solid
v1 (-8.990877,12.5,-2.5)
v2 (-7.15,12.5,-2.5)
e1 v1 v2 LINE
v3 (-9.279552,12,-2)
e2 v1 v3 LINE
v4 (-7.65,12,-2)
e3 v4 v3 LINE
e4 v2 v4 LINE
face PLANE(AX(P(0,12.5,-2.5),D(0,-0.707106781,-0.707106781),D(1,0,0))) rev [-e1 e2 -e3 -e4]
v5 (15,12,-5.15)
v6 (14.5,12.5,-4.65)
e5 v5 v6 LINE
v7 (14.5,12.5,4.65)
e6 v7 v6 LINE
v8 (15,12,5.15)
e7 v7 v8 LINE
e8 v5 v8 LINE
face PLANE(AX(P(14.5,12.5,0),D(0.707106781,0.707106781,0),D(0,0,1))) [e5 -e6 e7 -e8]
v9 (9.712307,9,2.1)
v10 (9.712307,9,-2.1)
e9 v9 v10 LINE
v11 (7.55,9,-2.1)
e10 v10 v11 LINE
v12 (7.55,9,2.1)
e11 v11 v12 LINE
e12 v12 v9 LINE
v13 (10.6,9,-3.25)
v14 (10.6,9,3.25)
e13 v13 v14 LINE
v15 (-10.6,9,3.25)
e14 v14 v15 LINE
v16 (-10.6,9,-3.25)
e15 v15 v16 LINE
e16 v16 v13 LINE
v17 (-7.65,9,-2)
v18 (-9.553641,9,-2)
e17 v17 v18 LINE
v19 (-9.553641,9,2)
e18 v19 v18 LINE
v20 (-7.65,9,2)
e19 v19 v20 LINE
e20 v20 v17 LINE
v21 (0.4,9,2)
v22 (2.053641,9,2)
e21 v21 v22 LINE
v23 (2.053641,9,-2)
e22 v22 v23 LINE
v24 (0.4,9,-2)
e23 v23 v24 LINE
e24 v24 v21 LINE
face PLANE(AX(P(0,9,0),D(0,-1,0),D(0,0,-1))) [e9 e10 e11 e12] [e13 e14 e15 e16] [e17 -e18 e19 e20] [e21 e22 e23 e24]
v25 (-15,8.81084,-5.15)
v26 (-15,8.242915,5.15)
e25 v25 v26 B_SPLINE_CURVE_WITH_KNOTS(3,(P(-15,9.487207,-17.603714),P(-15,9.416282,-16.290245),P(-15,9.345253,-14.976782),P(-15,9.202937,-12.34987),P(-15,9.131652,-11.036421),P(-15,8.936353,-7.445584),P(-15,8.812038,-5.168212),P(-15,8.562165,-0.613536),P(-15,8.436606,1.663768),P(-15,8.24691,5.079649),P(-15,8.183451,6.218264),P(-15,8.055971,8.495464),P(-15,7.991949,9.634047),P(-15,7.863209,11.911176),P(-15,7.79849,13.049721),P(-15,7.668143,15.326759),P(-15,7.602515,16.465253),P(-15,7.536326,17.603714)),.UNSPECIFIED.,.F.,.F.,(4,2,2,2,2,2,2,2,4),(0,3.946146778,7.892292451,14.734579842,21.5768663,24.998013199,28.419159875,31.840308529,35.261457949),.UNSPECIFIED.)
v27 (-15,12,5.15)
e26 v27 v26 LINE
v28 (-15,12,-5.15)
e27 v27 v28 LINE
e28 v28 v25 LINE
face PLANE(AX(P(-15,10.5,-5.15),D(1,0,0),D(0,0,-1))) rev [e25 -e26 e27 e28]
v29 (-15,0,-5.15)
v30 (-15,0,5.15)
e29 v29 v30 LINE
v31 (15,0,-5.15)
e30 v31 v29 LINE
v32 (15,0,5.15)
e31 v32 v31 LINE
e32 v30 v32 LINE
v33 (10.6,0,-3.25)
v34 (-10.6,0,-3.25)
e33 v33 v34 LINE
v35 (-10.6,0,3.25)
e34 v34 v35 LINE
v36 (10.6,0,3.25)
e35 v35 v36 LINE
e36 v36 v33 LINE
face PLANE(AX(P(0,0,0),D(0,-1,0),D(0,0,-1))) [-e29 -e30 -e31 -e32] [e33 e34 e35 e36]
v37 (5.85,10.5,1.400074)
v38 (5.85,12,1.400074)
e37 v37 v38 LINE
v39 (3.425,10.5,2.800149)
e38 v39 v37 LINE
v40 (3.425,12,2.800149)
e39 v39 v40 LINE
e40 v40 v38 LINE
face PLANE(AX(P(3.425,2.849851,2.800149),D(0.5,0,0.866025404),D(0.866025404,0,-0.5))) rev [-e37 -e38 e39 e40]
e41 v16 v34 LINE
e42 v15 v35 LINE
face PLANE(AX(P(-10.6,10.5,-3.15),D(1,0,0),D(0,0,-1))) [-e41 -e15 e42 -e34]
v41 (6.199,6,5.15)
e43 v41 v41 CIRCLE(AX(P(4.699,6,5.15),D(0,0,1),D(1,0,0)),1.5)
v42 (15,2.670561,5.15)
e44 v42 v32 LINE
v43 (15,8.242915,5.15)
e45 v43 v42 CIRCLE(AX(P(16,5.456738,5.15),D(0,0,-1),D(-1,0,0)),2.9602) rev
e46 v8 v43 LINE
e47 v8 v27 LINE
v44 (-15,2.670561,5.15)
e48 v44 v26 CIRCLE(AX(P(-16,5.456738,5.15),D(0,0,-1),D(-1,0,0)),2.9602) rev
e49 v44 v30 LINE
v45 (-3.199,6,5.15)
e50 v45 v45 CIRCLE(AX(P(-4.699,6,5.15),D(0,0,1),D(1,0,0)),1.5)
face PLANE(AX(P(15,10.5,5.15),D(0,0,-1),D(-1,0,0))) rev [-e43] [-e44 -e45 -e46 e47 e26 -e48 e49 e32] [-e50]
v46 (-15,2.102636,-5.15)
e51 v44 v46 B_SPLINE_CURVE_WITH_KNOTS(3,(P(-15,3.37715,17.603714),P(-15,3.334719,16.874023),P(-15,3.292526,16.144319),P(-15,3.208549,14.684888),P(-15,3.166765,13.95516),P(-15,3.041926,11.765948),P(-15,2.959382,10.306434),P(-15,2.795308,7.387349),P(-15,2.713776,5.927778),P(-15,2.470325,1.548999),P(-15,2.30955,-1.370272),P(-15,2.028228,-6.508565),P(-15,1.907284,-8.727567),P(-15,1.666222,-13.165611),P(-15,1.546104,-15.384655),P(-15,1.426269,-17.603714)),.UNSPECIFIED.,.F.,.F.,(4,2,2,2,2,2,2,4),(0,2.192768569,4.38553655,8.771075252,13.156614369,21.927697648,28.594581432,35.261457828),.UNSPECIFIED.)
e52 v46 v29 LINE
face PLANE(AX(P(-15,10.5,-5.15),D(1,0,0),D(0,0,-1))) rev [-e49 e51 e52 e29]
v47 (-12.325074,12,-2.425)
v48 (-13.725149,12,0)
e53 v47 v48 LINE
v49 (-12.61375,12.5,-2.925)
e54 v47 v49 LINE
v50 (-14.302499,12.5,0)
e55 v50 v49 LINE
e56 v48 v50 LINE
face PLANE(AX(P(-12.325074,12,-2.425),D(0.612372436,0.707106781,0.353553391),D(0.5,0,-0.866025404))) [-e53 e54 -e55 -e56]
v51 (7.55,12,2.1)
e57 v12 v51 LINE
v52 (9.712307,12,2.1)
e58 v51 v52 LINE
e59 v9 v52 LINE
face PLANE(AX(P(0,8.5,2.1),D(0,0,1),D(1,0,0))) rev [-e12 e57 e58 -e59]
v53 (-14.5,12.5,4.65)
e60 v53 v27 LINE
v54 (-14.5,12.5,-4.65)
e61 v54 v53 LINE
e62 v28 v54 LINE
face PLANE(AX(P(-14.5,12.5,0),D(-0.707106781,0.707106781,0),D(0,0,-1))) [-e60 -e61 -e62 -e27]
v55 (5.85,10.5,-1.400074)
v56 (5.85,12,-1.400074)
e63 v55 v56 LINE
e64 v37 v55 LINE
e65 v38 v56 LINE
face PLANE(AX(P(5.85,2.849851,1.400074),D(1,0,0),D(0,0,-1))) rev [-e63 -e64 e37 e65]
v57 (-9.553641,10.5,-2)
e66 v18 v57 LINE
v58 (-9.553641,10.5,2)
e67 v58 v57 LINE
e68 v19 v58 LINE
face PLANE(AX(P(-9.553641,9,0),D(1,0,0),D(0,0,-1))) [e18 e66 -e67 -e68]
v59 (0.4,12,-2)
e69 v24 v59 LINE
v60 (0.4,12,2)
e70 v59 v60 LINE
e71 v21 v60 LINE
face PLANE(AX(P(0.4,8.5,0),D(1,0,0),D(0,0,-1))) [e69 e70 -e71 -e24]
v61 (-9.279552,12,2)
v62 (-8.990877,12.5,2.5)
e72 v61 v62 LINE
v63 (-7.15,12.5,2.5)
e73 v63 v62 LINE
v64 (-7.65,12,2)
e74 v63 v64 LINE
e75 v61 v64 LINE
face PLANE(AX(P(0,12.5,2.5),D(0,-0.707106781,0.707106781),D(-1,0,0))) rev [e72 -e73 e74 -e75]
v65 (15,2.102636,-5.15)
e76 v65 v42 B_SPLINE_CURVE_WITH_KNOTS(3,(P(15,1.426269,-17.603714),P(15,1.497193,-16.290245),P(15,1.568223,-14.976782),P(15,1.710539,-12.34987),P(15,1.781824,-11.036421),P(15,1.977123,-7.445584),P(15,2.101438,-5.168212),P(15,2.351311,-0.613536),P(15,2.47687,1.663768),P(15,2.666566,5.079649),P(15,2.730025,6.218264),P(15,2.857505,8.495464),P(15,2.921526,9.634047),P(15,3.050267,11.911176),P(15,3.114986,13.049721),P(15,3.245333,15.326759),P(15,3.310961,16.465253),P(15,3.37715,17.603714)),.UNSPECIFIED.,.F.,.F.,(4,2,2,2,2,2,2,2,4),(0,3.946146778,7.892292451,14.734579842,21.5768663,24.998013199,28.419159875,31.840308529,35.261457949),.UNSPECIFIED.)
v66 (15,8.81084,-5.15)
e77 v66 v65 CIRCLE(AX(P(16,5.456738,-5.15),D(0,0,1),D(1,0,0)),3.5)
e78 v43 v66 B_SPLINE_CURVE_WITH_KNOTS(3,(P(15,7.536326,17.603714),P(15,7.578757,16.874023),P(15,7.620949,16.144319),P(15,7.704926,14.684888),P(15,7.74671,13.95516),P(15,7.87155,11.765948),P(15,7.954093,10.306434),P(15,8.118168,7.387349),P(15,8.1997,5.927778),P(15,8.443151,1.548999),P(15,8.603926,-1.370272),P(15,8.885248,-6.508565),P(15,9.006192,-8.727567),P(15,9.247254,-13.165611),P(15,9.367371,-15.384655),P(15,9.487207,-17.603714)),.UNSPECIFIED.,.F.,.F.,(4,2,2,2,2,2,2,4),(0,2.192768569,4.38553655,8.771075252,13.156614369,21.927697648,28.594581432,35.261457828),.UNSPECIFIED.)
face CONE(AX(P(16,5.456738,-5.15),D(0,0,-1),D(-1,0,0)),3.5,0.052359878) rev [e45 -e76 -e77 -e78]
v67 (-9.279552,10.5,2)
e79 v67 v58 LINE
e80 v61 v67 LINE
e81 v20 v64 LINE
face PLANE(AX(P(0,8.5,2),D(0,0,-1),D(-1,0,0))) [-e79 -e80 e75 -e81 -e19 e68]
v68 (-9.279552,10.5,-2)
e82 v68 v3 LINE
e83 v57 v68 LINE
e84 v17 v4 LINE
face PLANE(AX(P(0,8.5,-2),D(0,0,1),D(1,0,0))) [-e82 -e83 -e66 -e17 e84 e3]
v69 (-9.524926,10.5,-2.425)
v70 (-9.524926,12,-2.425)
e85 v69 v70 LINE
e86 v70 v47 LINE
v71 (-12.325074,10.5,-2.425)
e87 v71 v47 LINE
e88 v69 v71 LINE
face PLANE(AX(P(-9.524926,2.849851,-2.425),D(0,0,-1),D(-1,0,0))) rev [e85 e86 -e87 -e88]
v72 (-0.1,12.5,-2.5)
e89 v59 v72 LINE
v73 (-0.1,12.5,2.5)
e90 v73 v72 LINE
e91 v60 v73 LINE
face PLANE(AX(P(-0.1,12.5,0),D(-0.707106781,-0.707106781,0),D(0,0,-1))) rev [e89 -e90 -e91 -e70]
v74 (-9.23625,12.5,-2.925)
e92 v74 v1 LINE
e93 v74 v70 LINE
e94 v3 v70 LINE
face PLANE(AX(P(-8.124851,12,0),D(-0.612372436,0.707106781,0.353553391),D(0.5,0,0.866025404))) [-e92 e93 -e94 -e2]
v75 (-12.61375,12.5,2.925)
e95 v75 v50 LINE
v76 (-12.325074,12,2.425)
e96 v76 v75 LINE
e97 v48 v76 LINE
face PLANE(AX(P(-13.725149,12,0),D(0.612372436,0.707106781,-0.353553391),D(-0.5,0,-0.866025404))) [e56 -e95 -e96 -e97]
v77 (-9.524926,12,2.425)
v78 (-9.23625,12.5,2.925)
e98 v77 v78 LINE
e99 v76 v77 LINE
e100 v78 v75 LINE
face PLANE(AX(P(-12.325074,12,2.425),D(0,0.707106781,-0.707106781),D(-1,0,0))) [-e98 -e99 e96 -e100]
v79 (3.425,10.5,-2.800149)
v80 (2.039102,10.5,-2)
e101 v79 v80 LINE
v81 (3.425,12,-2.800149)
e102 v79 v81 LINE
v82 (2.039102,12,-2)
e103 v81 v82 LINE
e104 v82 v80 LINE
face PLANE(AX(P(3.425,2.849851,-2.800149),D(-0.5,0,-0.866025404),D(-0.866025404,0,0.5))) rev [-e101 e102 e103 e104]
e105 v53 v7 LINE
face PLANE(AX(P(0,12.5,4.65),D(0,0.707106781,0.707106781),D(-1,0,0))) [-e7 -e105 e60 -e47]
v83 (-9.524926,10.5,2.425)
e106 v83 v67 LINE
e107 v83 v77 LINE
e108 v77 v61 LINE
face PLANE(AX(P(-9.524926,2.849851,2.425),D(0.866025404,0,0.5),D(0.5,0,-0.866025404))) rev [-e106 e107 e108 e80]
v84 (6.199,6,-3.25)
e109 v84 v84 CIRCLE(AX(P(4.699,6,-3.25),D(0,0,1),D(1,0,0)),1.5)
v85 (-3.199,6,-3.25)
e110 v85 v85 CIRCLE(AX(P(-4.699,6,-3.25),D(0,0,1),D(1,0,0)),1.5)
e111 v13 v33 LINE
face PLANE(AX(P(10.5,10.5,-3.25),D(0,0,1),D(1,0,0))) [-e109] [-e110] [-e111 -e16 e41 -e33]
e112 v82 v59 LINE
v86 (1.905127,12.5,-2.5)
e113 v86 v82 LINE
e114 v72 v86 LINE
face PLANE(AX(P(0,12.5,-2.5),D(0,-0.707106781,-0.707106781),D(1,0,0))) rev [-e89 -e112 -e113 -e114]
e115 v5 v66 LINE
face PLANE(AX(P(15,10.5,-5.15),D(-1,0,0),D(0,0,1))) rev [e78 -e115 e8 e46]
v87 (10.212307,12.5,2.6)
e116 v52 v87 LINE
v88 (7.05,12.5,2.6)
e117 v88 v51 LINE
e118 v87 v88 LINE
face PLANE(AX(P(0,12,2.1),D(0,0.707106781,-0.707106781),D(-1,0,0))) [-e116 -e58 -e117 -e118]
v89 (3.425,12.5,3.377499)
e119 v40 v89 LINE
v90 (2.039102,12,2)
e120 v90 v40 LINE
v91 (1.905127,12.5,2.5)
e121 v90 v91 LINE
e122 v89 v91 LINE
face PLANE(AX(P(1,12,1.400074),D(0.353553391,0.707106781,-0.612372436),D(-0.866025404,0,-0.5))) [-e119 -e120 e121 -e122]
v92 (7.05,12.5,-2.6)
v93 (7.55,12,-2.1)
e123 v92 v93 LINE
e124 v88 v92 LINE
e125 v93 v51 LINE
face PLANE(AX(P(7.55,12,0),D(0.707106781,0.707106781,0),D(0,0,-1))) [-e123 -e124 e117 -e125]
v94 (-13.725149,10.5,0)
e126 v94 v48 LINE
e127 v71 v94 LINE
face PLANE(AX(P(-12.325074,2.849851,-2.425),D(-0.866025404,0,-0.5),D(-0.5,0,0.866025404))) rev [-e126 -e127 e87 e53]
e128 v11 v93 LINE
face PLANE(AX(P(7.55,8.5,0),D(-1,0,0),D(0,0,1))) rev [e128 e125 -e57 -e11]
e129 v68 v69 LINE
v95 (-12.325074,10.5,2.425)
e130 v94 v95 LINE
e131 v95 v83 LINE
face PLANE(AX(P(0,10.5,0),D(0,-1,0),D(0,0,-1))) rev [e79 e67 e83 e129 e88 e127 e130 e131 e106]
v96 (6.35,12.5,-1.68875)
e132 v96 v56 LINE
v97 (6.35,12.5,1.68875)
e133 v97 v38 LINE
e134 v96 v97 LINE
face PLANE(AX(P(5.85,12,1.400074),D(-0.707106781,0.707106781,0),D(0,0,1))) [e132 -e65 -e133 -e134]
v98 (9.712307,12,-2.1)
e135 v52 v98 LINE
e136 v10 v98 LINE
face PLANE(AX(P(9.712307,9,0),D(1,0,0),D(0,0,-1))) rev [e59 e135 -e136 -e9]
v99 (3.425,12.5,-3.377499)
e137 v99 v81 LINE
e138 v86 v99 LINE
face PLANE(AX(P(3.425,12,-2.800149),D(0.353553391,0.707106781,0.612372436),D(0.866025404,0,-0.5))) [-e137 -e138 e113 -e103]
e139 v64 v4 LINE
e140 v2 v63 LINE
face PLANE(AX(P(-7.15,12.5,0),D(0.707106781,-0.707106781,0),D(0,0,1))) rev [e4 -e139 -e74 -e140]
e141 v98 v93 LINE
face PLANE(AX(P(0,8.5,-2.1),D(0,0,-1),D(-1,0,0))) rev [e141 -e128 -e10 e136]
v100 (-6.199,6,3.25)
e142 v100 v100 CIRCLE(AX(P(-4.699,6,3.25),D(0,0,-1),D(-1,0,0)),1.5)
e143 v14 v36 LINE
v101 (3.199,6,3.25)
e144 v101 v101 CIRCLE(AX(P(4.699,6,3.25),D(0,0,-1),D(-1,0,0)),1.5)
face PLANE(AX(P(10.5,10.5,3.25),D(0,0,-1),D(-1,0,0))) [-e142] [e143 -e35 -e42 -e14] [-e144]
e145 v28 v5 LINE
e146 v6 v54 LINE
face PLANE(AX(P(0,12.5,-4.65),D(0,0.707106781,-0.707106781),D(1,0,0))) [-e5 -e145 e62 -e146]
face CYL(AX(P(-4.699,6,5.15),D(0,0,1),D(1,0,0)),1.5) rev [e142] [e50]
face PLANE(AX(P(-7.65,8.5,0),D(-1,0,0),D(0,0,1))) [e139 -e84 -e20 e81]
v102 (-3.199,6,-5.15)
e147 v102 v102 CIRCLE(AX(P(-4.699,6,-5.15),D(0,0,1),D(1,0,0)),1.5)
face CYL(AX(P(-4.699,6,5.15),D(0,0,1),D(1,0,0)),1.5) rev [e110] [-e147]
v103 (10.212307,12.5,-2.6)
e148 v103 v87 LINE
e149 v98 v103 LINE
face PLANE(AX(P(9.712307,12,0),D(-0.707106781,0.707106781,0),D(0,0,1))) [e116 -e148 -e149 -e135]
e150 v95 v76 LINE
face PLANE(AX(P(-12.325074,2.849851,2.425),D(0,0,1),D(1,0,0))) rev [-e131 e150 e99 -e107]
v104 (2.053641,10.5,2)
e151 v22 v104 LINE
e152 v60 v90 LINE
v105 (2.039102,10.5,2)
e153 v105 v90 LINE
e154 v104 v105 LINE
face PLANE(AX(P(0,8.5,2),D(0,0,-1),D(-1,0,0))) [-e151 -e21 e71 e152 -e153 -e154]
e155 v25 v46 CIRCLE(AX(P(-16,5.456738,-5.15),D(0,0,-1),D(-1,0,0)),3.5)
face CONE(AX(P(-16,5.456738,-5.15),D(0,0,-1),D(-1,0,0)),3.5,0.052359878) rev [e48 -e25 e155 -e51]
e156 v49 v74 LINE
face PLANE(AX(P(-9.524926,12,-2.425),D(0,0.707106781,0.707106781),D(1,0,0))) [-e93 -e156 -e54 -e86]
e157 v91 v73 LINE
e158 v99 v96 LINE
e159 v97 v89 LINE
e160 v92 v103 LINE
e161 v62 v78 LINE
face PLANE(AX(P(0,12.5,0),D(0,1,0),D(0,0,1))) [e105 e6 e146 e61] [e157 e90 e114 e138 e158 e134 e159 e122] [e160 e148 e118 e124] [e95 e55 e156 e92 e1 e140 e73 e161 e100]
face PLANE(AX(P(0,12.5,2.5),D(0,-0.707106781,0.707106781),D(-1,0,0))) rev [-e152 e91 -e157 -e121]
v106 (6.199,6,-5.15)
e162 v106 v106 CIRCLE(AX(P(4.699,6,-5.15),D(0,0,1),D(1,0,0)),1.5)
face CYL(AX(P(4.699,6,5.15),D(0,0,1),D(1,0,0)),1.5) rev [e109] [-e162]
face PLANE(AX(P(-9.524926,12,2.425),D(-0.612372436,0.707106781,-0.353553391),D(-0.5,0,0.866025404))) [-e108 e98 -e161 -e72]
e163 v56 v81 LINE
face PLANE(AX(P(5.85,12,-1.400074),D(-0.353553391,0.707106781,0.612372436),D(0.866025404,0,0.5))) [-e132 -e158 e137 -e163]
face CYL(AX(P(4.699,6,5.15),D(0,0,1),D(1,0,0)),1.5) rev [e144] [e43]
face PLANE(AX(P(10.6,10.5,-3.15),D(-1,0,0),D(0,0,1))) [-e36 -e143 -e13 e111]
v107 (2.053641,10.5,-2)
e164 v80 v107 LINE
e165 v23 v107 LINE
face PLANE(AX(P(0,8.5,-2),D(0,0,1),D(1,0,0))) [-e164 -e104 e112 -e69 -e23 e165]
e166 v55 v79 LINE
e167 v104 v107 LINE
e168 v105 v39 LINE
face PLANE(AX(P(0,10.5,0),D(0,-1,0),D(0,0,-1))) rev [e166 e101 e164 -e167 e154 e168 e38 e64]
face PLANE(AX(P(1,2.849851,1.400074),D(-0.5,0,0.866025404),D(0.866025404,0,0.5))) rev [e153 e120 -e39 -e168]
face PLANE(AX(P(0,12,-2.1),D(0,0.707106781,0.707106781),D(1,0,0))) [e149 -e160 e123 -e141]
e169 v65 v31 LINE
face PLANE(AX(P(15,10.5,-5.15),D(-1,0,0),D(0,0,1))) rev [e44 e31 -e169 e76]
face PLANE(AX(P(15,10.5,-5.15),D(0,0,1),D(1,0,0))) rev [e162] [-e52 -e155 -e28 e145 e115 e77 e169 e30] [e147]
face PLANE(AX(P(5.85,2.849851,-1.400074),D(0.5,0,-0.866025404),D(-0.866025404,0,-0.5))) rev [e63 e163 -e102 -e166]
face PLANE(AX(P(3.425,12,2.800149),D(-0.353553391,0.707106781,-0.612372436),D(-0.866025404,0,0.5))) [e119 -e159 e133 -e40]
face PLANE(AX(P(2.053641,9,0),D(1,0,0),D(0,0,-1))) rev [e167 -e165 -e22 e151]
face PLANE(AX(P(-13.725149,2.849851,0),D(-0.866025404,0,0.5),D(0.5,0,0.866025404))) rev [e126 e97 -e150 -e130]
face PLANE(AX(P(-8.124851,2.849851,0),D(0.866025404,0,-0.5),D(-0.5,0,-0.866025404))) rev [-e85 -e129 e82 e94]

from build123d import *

# Parameters (mm, degrees)
SKETCH1_W                    = 30
SKETCH1_H                    = 10.3
SKETCH1_W_2                  = 21
SKETCH1_H_2                  = 6.3
BOSS_EXTRUDE1_DEPTH          = 10.5
F_3_0_3_DIAMETER_HOLE1_D     = 3
SKETCH4_W                    = 30
SKETCH4_H                    = 10.3
SKETCH4_R                    = 2.425
BOSS_EXTRUDE2_DEPTH          = 2
CUT_EXTRUDE2_START           = -4
CUT_EXTRUDE2_DEPTH           = 4
CUT_EXTRUDE3_START           = -4
CUT_EXTRUDE3_DEPTH           = 4
MOVE_START                   = -10.6
MOVE_FACE1_OUTLINE_W         = 10.5
MOVE_FACE1_OUTLINE_H         = 6.5
MOVE_FACE1_DEPTH             = 21.2
MOVE_START_2                 = 7.55
MOVE_FACE1_2_OUTLINE_W       = 2
MOVE_FACE1_2_OUTLINE_H       = 4.2
MOVE_FACE1_2_DEPTH           = 2.162306716
BOSS_EXTRUDE3_START          = 1.5
BOSS_EXTRUDE3_DEPTH          = 1.5
CUT_EXTRUDE4_DEPTH           = 2
DELETEFACE1_START            = 10.5
DELETEFACE1_DEPTH            = 2
CHAMFER1_SIZE                = 0.5
SKETCH10_R                   = 3.5
CUT_EXTRUDE5_DEPTH           = 10.3
CUT_EXTRUDE5_DRAFT           = -3
CUT_EXTRUDE5_PROFILE_2_DEPTH = 10.3
CUT_EXTRUDE5_PROFILE_2_DRAFT = -3


# Read off the part's stored shape, not the designer's step: Move Face1, DeleteFace1
with BuildPart() as part:
    # Sketch1 → Boss-Extrude1 (new body)
    with BuildSketch(Plane(origin=(0, 0, 0), x_dir=(1, 0, 0), z_dir=(0, 1, 0))):
        Rectangle(SKETCH1_W, SKETCH1_H)
        Rectangle(SKETCH1_W_2, SKETCH1_H_2, mode=Mode.SUBTRACT)
    extrude(amount=BOSS_EXTRUDE1_DEPTH)

    # Ø3.0 (3) Diameter Hole1 (through all)
    with Locations(Plane.XY.offset(5.15)):
        with Locations((-4.699, 6), (4.699, 6)):
            Hole(F_3_0_3_DIAMETER_HOLE1_D / 2)

    # Sketch4 → Boss-Extrude2 (add)
    with BuildSketch(Plane(origin=(0, 10.5, 0), x_dir=(1, 0, 0), z_dir=(0, 1, 0))):
        Rectangle(SKETCH4_W, SKETCH4_H)
        with Locations(Location((-10.925, 0, 0), (0, 0, 79.906343141))):
            Circle(SKETCH4_R, mode=Mode.SUBTRACT)
        with Locations(Location((10.925, 0, 0), (0, 0, 100.093656859))):
            Circle(SKETCH4_R, mode=Mode.SUBTRACT)
        with Locations(Location((3.425, 0, 0), (0, 0, 270))):
            Circle(SKETCH4_R, mode=Mode.SUBTRACT)
    extrude(amount=BOSS_EXTRUDE2_DEPTH)

    # Sketch5 → Cut-Extrude2 (cut)
    with BuildSketch(Plane(origin=(0, 12.5, 0), x_dir=(1, 0, 0), z_dir=(0, 1, 0)).offset(CUT_EXTRUDE2_START)):
        with BuildLine():
            Line((-7.65, 2), (-8.4, 2))
            Line((-8.4, 2), (-9.553641185, 2))
            ThreePointArc((-9.553641185, 2), (-8.779519852, 1.130283122), (-8.5, 0))
            ThreePointArc((-8.5, 0), (-8.779519852, -1.130283122), (-9.553641185, -2))
            Line((-9.553641185, -2), (-8.4, -2))
            Line((-8.4, -2), (-7.65, -2))
            Line((-7.65, -2), (-7.65, 2))
        make_face()
    cut_extrude2 = extrude(amount=CUT_EXTRUDE2_DEPTH, mode=Mode.SUBTRACT)

    # Sketch6 → Cut-Extrude3 (cut)
    with BuildSketch(Plane(origin=(0, 12.5, 0), x_dir=(1, 0, 0), z_dir=(0, 1, 0)).offset(CUT_EXTRUDE3_START)):
        with BuildLine():
            Line((2.053641185, 2), (1, 2))
            Line((1, 2), (0.4, 2))
            Line((0.4, 2), (0.4, -2))
            Line((0.4, -2), (1, -2))
            Line((1, -2), (2.053641185, -2))
            ThreePointArc((2.053641185, -2), (1, 0), (2.053641185, 2))
        make_face()
    extrude(amount=CUT_EXTRUDE3_DEPTH, mode=Mode.SUBTRACT)

    # Mirror1: Cut-Extrude2 across plane
    add(cut_extrude2.mirror(Plane(origin=(0, 0, 0), x_dir=(0, 0, 1), z_dir=(1, 0, 0))), mode=Mode.SUBTRACT)

    # Move Face1 outline → Move Face1 (cut)
    with BuildSketch(Plane.YZ.offset(MOVE_START)):
        with Locations((5.25, 0)):
            Rectangle(MOVE_FACE1_OUTLINE_W, MOVE_FACE1_OUTLINE_H)
    extrude(amount=MOVE_FACE1_DEPTH, mode=Mode.SUBTRACT)

    # Move Face1 2 outline → Move Face1 2 (cut)
    with BuildSketch(Plane.YZ.offset(MOVE_START_2)):
        with Locations((11.5, 0)):
            Rectangle(MOVE_FACE1_2_OUTLINE_W, MOVE_FACE1_2_OUTLINE_H)
    extrude(amount=MOVE_FACE1_2_DEPTH, mode=Mode.SUBTRACT)

    # Sketch7 → Boss-Extrude3 (add)
    # profile 1 of 4: a face of its own
    with BuildSketch(Plane.XZ.offset(-10.5).offset(BOSS_EXTRUDE3_START)):
        with BuildLine():
            Line((9.712306716, -2.1), (7.55, -2.1))
            Line((7.55, -2.1), (7.55, 2.1))
            Line((7.55, 2.1), (9.712306716, 2.1))
            ThreePointArc((9.712306716, 2.1), (10.141357197, 2.294891927), (10.6, 2.403122968))
            Line((10.6, 2.403122968), (10.6, 3.25))
            Line((10.6, 3.25), (-10.6, 3.25))
            Line((-10.6, 3.25), (-10.6, 2.403122968))
            ThreePointArc((-10.6, 2.403122968), (-10.053199943, 2.262871994), (-9.553641185, 2))
            Line((-9.553641185, 2), (-7.65, 2))
            Line((-7.65, 2), (-7.65, -2))
            Line((-7.65, -2), (-9.553641185, -2))
            ThreePointArc((-9.553641185, -2), (-10.053199943, -2.262871994), (-10.6, -2.403122968))
            Line((-10.6, -2.403122968), (-10.6, -3.25))
            Line((-10.6, -3.25), (10.6, -3.25))
            Line((10.6, -3.25), (10.6, -2.403122968))
            ThreePointArc((10.6, -2.403122968), (10.141357197, -2.294891927), (9.712306716, -2.1))
        make_face()
        with BuildLine():
            Line((0.4, -2), (0.4, 2))
            Line((0.4, 2), (2.053641185, 2))
            ThreePointArc((2.053641185, 2), (5.85, 0), (2.053641185, -2))
            Line((2.053641185, -2), (0.4, -2))
        make_face(mode=Mode.SUBTRACT)
    # profile 2 of 4: a face of its own
    with BuildSketch(Plane.XZ.offset(-10.5).offset(BOSS_EXTRUDE3_START)):
        with BuildLine():
            Line((2.053641185, 2), (2.053641185, -2))
            ThreePointArc((2.053641185, -2), (5.85, 0), (2.053641185, 2))
        make_face()
    # profile 3 of 4: a face of its own
    with BuildSketch(Plane.XZ.offset(-10.5).offset(BOSS_EXTRUDE3_START)):
        with BuildLine():
            Line((-9.553641185, 2), (-9.553641185, -2))
            ThreePointArc((-9.553641185, -2), (-10.053199943, -2.262871994), (-10.6, -2.403122968))
            Line((-10.6, -2.403122968), (-10.6, 2.403122968))
            ThreePointArc((-10.6, 2.403122968), (-10.053199943, 2.262871994), (-9.553641185, 2))
        make_face()
    # profile 4 of 4: a face of its own
    with BuildSketch(Plane.XZ.offset(-10.5).offset(BOSS_EXTRUDE3_START)):
        with BuildLine():
            Line((10.6, 2.403122968), (10.6, -2.403122968))
            ThreePointArc((10.6, -2.403122968), (10.141357197, -2.294891927), (9.712306716, -2.1))
            Line((9.712306716, -2.1), (9.712306716, 2.1))
            ThreePointArc((9.712306716, 2.1), (10.141357197, 2.294891927), (10.6, 2.403122968))
        make_face()
    extrude(amount=-BOSS_EXTRUDE3_DEPTH)

    # Sketch9 → Cut-Extrude4 (cut)
    with BuildSketch(Plane(origin=(0, 12.5, 0), x_dir=(1, 0, 0), z_dir=(0, 1, 0))):
        Polygon((-12.325074403, 2.425), (-13.725148806, 0), (-12.325074403, -2.425), (-9.524925597, -2.425), (-8.124851194, 0), (-9.524925597, 2.425), align=None)
        Polygon((1, 1.400074403), (1, -1.400074403), (3.425, -2.800148806), (5.85, -1.400074403), (5.85, 1.400074403), (3.425, 2.800148806), align=None)
        Polygon((11.64973184, 2.704736049), (8.944995791, 1.980004209), (8.220263951, -0.72473184), (10.20026816, -2.704736049), (12.905004209, -1.980004209), (13.629736049, 0.72473184), align=None)
    extrude(amount=-CUT_EXTRUDE4_DEPTH, mode=Mode.SUBTRACT)

    # DeleteFace1 outline → DeleteFace1 (add)
    with BuildSketch(Plane(origin=(0, 0, 0), x_dir=(1, 0, 0), z_dir=(0, 1, 0)).offset(DELETEFACE1_START)):
        Polygon((9.392826181, 2.1), (9.712306716, 2.1), (9.712306716, -2.1), (9.595532111, -2.1), (10.20026816, -2.704736049), (12.905004209, -1.980004209), (13.629736049, 0.72473184), (11.64973184, 2.704736049), align=None)
    extrude(amount=DELETEFACE1_DEPTH)

    # Chamfer1
    chamfer1_edges = [part.edges().sort_by_distance(p)[0] for p in [
        (8.631153358, 12.5, 2.1),
        (7.55, 12.5, 0),
        (8.631153358, 12.5, -2.1),
        (1.219550808, 12.5, 2),
        (-8.464775866, 12.5, -2),
        (-10.925, 12.5, 2.425),
        (-9.402238665, 12.5, 2.2125),
        (-13.025111604, 12.5, 1.2125),
        (-13.025111604, 12.5, -1.2125),
        (-10.925, 12.5, -2.425),
        (-9.402238665, 12.5, -2.2125),
        (2.732050808, 12.5, 2.400074403),
        (4.6375, 12.5, 2.100111604),
        (5.85, 12.5, 0),
        (4.6375, 12.5, -2.100111604),
        (2.732050808, 12.5, -2.400074403),
        (9.712306716, 12.5, 0),
        (0, 12.5, -5.15),
        (-15, 12.5, 0),
        (0, 12.5, 5.15),
        (15, 12.5, 0),
        (-7.65, 12.5, 0),
        (-8.464775866, 12.5, 2),
        (0.4, 12.5, 0),
        (1.219550808, 12.5, -2),
    ]]
    chamfer(chamfer1_edges, length=CHAMFER1_SIZE)


with BuildPart() as cut_extrude5_tool:
    # Sketch10 → Cut-Extrude5 (with draft: the straight prism first)
    with BuildSketch(Plane(origin=(0, 0, -5.15), x_dir=(-1, 0, 0), z_dir=(0, 0, -1))):
        with Locations((16, 5.45673788)):
            Circle(SKETCH10_R)
    extrude(amount=-CUT_EXTRUDE5_DEPTH)
    # Cut-Extrude5: the draft: its side faces are tilted about the plane it starts from
    cut_extrude5_sides = [cut_extrude5_tool.faces().sort_by_distance(p)[0] for p in [
        (-12.5, 5.45673788, 0),
    ]]
    draft(cut_extrude5_sides, Plane(origin=(0, 0, -5.15), x_dir=(-1, 0, 0), z_dir=(0, 0, -1)), CUT_EXTRUDE5_DRAFT)


with BuildPart() as part_1:
    add(part.part)

    # Cut-Extrude5: cut by cut_extrude5_tool
    add(cut_extrude5_tool.part, mode=Mode.SUBTRACT)


with BuildPart() as cut_extrude5_profile_2_tool:
    # Sketch10 → Cut-Extrude5 profile 2 (with draft: the straight prism first)
    with BuildSketch(Plane(origin=(0, 0, -5.15), x_dir=(-1, 0, 0), z_dir=(0, 0, -1))):
        with Locations((-16, 5.45673788)):
            Circle(SKETCH10_R)
    extrude(amount=-CUT_EXTRUDE5_PROFILE_2_DEPTH)
    # Cut-Extrude5 profile 2: the draft: its side faces are tilted about the plane it starts from
    cut_extrude5_profile_2_sides = [cut_extrude5_profile_2_tool.faces().sort_by_distance(p)[0] for p in [
        (19.5, 5.45673788, 0),
    ]]
    draft(cut_extrude5_profile_2_sides, Plane(origin=(0, 0, -5.15), x_dir=(-1, 0, 0), z_dir=(0, 0, -1)), CUT_EXTRUDE5_PROFILE_2_DRAFT)


with BuildPart() as part_2:
    add(part_1.part)

    # Cut-Extrude5 profile 2: cut by cut_extrude5_profile_2_tool
    add(cut_extrude5_profile_2_tool.part, mode=Mode.SUBTRACT)


solid = part_2.part
